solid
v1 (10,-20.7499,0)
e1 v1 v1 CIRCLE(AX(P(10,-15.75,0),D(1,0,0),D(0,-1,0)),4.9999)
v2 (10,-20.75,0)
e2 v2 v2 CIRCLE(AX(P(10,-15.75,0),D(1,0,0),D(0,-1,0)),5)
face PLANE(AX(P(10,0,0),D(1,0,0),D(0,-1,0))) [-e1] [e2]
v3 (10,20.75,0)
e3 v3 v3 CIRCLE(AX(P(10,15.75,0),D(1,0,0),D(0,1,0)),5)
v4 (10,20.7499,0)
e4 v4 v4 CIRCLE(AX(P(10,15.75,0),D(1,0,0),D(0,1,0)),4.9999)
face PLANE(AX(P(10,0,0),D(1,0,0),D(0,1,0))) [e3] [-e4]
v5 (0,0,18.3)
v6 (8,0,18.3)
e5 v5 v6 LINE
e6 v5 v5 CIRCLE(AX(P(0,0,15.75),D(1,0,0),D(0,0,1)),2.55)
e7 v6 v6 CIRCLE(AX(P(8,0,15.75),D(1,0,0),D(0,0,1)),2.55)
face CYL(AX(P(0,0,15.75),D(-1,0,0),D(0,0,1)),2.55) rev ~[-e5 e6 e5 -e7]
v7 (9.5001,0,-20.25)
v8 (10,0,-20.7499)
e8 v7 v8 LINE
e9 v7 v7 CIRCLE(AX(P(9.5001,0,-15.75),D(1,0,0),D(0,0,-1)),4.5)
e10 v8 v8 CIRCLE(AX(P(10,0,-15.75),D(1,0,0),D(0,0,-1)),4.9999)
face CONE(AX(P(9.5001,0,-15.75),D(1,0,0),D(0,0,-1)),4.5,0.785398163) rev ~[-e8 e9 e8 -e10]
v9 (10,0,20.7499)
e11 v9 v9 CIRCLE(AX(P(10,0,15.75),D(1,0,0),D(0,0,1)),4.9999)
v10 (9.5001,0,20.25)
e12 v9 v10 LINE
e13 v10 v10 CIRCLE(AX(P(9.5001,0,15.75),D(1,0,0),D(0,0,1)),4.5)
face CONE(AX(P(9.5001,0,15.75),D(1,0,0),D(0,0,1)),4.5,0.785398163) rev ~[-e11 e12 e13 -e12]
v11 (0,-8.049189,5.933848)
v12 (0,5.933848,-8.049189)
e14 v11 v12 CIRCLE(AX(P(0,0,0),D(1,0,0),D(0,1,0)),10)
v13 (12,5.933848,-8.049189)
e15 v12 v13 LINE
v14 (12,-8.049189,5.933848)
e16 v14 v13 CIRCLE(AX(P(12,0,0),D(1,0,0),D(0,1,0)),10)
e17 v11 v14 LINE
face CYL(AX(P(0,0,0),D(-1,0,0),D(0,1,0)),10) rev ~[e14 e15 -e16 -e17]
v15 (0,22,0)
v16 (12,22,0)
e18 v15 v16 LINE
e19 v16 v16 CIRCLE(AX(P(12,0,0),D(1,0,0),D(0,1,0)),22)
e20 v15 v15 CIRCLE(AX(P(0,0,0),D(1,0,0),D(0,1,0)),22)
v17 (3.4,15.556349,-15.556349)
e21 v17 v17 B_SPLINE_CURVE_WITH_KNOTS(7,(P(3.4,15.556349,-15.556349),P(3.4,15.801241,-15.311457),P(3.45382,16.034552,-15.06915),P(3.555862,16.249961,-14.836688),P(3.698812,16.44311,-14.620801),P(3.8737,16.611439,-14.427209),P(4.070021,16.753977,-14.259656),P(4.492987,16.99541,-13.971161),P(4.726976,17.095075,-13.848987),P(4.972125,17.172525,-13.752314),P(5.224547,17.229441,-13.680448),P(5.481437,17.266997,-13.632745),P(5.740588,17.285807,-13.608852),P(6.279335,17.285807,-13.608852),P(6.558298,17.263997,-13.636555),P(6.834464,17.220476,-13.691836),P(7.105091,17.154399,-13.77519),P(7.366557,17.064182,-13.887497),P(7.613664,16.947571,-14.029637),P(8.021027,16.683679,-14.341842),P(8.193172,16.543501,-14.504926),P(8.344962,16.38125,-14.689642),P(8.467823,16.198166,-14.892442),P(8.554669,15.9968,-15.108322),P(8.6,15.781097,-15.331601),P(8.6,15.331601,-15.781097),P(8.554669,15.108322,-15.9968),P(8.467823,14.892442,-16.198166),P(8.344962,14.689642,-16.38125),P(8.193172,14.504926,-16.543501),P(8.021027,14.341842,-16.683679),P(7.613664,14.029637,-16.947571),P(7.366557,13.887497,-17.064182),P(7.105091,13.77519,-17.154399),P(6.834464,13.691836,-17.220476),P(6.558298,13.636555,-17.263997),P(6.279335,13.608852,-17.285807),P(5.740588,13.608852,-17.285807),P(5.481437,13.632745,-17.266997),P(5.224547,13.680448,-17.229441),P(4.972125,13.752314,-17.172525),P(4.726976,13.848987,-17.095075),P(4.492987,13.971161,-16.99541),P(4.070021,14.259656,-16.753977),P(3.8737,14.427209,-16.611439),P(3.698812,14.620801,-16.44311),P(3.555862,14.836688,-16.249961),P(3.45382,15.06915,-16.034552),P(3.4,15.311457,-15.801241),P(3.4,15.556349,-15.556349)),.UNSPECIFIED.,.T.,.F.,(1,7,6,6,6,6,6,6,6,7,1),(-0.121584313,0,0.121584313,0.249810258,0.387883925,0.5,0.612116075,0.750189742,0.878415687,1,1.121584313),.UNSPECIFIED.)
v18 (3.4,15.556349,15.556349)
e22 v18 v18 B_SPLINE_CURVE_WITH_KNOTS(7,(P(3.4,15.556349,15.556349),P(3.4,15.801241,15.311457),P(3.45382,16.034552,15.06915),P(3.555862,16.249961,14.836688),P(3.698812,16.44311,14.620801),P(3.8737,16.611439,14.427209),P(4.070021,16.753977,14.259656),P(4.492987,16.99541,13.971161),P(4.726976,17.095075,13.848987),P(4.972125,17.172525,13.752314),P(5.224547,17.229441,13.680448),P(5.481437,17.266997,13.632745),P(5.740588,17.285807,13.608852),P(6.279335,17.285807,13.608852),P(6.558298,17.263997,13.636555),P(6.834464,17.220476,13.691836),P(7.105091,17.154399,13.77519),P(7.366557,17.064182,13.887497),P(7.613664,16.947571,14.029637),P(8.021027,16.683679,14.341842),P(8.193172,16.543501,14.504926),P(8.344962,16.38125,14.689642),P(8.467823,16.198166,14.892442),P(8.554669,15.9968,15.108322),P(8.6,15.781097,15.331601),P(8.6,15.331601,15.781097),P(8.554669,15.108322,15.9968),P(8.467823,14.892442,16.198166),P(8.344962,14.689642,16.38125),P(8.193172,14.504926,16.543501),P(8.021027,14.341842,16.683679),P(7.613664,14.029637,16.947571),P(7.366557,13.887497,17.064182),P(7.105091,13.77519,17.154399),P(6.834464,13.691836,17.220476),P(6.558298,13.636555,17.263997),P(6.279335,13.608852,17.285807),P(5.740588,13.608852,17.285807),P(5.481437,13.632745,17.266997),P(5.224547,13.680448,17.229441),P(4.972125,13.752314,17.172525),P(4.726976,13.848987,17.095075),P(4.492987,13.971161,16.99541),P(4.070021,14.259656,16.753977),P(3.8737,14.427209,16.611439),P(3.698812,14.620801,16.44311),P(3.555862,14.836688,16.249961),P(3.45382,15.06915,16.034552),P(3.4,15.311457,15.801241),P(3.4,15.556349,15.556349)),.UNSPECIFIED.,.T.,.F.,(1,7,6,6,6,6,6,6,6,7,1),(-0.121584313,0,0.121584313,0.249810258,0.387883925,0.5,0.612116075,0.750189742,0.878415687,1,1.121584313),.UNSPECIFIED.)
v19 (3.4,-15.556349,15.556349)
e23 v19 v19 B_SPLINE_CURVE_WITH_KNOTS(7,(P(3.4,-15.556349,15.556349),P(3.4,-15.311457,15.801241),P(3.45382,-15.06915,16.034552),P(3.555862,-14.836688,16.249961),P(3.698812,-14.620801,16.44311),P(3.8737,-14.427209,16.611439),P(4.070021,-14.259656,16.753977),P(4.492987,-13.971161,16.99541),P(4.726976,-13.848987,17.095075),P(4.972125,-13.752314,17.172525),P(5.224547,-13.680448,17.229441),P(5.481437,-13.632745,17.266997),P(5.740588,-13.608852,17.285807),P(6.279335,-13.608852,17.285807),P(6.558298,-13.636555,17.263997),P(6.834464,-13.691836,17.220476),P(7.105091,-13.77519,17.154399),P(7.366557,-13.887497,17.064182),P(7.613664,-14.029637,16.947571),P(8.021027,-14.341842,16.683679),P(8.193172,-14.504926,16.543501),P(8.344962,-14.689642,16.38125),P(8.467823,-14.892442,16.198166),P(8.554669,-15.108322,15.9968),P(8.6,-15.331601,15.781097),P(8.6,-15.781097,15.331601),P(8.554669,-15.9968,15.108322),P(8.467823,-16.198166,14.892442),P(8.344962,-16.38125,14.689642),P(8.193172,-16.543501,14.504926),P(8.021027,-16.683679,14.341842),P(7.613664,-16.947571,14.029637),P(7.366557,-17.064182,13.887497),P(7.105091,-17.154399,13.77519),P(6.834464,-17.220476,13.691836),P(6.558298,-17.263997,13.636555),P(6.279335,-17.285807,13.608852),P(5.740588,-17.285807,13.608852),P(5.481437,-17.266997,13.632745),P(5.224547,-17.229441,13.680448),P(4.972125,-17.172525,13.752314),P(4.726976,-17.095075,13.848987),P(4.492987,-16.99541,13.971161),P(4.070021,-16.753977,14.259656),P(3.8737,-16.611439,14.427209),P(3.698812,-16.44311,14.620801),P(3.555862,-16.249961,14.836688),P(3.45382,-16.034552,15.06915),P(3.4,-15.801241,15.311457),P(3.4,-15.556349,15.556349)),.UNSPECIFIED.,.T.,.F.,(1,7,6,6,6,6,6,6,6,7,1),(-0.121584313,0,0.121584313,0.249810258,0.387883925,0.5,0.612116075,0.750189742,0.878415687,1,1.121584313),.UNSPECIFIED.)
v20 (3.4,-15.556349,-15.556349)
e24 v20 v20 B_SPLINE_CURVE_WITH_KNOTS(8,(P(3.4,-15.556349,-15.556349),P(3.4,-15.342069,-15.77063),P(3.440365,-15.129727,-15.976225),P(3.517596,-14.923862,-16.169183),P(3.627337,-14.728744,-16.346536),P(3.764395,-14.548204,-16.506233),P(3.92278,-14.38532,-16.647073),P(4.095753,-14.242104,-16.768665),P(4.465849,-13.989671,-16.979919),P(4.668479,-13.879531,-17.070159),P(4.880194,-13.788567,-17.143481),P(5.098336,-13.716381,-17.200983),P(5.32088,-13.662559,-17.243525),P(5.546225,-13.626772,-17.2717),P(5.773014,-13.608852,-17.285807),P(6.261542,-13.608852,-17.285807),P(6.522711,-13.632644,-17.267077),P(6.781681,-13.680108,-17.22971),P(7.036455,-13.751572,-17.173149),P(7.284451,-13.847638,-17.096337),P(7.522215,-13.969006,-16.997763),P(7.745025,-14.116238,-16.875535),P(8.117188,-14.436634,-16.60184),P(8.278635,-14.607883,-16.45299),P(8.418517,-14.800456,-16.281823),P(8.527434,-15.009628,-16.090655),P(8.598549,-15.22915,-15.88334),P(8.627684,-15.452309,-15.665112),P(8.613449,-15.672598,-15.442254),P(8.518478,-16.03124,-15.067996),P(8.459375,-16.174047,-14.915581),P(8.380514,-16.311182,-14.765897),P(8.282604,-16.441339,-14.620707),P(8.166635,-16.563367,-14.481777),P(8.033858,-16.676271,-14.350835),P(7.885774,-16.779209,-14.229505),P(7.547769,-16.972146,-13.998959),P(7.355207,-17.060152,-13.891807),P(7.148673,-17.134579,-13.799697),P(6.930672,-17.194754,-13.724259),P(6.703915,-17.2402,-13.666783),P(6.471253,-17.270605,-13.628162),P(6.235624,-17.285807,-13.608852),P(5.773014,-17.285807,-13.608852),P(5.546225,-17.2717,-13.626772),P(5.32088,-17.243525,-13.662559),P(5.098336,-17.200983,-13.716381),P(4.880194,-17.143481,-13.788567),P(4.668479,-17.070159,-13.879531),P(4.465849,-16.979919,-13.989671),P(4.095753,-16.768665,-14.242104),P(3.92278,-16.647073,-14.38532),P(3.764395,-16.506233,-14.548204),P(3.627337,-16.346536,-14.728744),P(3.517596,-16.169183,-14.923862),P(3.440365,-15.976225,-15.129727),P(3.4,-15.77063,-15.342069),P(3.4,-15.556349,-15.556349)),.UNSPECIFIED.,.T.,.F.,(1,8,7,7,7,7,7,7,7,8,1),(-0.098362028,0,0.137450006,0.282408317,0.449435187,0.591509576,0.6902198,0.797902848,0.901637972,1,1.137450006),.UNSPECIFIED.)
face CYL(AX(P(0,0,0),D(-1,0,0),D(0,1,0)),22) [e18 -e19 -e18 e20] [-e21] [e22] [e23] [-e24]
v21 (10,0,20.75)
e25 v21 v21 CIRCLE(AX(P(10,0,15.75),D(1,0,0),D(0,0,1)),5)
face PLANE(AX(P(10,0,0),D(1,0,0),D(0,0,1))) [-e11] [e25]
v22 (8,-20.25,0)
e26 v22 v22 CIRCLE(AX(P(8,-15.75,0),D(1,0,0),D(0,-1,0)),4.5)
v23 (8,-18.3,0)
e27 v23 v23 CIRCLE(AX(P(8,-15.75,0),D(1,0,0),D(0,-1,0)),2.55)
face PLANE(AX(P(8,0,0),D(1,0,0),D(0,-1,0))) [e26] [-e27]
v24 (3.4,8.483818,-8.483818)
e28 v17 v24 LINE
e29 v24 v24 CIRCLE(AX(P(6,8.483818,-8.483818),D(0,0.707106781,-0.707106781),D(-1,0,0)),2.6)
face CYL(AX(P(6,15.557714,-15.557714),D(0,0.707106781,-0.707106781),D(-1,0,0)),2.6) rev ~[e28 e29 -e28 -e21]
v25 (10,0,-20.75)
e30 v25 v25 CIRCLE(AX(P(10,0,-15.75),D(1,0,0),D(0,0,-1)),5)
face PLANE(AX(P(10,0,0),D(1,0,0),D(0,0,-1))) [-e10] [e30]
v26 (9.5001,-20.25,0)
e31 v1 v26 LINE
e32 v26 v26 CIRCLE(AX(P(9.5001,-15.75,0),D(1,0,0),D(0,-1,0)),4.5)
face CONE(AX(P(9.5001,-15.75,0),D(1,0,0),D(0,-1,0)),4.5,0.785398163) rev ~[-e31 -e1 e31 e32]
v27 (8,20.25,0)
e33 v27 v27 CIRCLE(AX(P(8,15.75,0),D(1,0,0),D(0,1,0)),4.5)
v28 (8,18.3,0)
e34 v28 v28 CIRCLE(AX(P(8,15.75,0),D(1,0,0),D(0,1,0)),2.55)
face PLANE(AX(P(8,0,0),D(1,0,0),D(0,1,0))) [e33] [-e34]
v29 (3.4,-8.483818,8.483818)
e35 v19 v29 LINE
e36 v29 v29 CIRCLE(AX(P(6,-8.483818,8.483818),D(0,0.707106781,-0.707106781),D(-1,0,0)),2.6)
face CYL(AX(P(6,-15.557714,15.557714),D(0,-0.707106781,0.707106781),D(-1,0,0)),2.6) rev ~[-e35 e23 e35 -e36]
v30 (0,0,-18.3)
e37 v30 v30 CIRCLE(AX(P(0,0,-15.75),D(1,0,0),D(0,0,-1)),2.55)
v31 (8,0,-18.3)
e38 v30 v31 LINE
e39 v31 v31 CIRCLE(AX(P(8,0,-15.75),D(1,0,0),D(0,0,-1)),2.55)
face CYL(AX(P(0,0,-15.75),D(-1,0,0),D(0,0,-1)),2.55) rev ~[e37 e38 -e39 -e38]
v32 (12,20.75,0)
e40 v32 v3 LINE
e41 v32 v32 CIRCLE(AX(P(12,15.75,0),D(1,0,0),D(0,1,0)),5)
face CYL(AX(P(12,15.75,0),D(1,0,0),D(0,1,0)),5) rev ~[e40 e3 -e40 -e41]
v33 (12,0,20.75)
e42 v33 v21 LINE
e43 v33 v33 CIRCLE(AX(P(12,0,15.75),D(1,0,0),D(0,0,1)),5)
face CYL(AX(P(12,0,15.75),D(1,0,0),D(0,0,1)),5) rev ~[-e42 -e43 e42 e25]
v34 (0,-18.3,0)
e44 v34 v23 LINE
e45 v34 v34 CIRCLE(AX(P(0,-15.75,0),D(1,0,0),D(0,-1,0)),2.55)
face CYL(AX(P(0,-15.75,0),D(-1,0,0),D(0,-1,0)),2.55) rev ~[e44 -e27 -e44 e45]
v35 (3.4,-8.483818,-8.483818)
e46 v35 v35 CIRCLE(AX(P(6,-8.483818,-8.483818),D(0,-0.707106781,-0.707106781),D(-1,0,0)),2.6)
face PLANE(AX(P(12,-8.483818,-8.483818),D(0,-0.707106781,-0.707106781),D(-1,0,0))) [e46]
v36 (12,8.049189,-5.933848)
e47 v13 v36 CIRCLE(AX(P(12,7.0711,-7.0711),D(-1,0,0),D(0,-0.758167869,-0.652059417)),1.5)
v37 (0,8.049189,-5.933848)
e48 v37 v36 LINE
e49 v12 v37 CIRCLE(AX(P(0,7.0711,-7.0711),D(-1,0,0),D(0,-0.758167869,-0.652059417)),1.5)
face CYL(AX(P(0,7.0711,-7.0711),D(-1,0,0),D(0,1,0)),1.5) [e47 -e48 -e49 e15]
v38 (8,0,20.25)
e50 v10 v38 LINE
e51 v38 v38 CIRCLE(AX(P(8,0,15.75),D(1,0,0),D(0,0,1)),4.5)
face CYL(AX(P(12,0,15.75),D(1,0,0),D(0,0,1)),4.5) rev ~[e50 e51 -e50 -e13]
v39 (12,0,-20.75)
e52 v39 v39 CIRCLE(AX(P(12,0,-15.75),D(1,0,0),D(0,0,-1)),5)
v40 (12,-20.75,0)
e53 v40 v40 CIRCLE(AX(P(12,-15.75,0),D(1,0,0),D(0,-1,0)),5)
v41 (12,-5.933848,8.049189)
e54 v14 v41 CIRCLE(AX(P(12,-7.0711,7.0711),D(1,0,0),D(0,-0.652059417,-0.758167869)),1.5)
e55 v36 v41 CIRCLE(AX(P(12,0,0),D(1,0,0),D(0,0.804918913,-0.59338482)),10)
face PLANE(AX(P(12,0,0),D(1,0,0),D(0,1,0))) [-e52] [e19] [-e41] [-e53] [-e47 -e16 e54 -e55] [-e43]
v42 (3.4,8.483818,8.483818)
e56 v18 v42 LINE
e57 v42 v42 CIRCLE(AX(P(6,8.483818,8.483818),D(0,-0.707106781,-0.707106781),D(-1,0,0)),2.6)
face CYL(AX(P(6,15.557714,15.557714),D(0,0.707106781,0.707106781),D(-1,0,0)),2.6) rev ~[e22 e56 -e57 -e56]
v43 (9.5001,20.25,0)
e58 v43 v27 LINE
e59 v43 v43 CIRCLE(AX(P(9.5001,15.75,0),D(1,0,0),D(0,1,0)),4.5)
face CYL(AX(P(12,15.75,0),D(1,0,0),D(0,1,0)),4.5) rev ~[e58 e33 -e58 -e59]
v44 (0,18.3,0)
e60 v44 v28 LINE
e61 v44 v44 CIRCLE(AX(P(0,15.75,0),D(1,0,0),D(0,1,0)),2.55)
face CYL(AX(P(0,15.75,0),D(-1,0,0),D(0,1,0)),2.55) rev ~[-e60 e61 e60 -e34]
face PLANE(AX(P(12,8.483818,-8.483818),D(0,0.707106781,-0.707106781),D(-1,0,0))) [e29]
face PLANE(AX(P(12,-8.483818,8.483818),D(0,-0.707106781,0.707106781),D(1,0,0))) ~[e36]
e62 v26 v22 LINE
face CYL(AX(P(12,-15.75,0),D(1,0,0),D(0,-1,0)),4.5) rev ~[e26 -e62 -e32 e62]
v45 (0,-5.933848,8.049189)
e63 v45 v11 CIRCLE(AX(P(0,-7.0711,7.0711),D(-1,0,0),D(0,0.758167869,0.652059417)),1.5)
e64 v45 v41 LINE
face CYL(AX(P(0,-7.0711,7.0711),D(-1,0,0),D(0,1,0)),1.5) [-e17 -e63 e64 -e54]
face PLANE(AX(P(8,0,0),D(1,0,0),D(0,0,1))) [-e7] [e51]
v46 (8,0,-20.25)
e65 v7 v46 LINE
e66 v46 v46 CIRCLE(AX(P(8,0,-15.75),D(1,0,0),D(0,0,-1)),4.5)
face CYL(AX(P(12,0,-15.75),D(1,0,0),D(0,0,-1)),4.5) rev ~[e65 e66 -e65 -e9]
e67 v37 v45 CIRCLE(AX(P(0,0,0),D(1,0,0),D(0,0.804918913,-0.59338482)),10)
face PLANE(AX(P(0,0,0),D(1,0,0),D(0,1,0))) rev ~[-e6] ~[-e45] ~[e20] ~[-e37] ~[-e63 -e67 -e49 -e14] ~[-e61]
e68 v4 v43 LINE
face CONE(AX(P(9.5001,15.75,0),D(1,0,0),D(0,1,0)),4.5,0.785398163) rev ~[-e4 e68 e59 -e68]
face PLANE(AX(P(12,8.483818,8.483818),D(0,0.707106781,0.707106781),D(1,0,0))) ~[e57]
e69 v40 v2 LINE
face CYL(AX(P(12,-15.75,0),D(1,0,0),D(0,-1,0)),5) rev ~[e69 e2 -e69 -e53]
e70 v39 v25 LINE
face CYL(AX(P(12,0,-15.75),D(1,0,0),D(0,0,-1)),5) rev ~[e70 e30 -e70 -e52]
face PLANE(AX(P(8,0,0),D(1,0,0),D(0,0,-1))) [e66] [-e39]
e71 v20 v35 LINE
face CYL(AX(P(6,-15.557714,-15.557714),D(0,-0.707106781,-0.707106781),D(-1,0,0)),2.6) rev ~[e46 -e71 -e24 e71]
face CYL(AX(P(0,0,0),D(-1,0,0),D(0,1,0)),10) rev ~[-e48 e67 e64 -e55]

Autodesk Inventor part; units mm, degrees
ref_plane "YZ Plane" through (0, 0, 0) normal (1, 0, 0) x (0, 1, 0)
ref_plane "XZ Plane" through (0, 0, 0) normal (0, 1, 0) x (-1, 0, 0)
ref_plane "XY Plane" through (0, 0, 0) normal (0, 0, 1) x (1, 0, 0)
sketch "Sketch2" plane through (0, 0, 0) normal (1, 0, 0) x (0, 1, 0)
  circle A0 centre (0, 0) radius 10
  circle A1 centre (0, 0) radius 22
  line L0 (0, 0) -> (7.0711, -7.0711)
  line L1 (0, 0) -> (10, 0) construction
  circle A2 centre (7.0711, -7.0711) radius 1.5
  line L2 (0, 0) -> (10.8294, 10.8294)
  line L3 (0, 0) -> (15.315, 0) construction
  circle A3 centre (-7.0711, 7.0711) radius 1.5
  dimension "d3" = 20
  dimension "d4" = 44
  dimension "d16" = 10
  dimension "d17" = 45
  dimension "d18" = 3
  dimension "d19" = 45
extrude "Extrusion1" add sketch "Sketch2" along normal blind 12 contours A2 A0 | A0 L0 A2 | A3 A0 | A0 A3 | A0 A2 L0 | A1
sketch "Sketch4" plane through (0, 0, 0) normal (1, 0, 0) x (0, 0, -1)
  circle A0 centre (0, 0) radius 15.75
  circle A1 centre (15.75, 0) radius 2.55
  dimension "d9" = 31.5
  dimension "d10" = 5.1
extrude "Extrusion3" cut sketch "Sketch4" along normal blind 30 contours A0 A1 | A0 A1 picked at (14.9184, -0.4924) picked at (16.4994, -0.6699)
sketch "Sketch5" plane through (12, 0, 0) normal (1, 0, 0) x (0, 0, -1)
  circle A0 centre (15.75, 0) radius 2.55 projected
  circle A1 centre (15.75, 0) radius 4.5
  point P0 (0, 0)
  dimension "d20" = 9
extrude "Extrusion4" cut sketch "Sketch5" against normal blind 4
sketch "Sketch6" plane through (12, 0, 0) normal (1, 0, 0) x (0, 0, -1)
  line L0 (0, 0) -> (15.5563, 15.5563)
  line L1 (0, 0) -> (22, 0) construction
  dimension "d23" = 22
  dimension "d24" = 45
ref_plane "Work Plane1" through (12, 15.5563, -15.5563) normal (0, 0.7071068, -0.7071068) x (-1, 0, 0)
sketch "Sketch7" plane through (12, 15.5563, -15.5563) normal (0, 0.7071068, -0.7071068) x (-1, 0, 0)
  line L0 (0, 22) -> (0, -22) projected
  line L1 (0, 0) -> (12, 0)
  circle A0 centre (6, 0) radius 2.6
  dimension "d25" = 5.2
extrude "Extrusion5" cut sketch "Sketch7" against normal blind 10
ref_plane "Work Plane2" through (12, 0, 0) normal (0, 0.7071068, -0.7071068) x (-1, 0, 0)
thread "Thread1" size "M5x0.8" class "6H" standard "ANSI Metric M Profile" full length
mirror "Mirror1" about plane through (12, 0, 0) normal (0, 0.7071068, -0.7071068) of "Extrusion5"
sketch "Sketch8" plane through (12, 0, 0) normal (1, 0, 0) x (0, 0, -1)
  line L0 (0, 0) -> (22, 0) construction
  circle A0 centre (15.75, 0) radius 2.55 projected
  circle A1 centre (15.75, 0) radius 5
  dimension "d33" = 10
extrude "Extrusion6" cut sketch "Sketch8" against normal blind 2
chamfer "Chamfer2" distance 0.5 angle 45 1 edges at (10, 0, -11.25)
pattern_circular "Circular Pattern1" count 4 over 360 about axis through (-10, 0, 0) along (1, 0, 0) of "Extrusion3", "Extrusion4", "Extrusion6", "Chamfer2"
mirror "Mirror2" about plane through (0, 0, 0) normal (0, 0, 1) of "Extrusion5", "Mirror1"
properties part number "Pen Holder Interface V3"
